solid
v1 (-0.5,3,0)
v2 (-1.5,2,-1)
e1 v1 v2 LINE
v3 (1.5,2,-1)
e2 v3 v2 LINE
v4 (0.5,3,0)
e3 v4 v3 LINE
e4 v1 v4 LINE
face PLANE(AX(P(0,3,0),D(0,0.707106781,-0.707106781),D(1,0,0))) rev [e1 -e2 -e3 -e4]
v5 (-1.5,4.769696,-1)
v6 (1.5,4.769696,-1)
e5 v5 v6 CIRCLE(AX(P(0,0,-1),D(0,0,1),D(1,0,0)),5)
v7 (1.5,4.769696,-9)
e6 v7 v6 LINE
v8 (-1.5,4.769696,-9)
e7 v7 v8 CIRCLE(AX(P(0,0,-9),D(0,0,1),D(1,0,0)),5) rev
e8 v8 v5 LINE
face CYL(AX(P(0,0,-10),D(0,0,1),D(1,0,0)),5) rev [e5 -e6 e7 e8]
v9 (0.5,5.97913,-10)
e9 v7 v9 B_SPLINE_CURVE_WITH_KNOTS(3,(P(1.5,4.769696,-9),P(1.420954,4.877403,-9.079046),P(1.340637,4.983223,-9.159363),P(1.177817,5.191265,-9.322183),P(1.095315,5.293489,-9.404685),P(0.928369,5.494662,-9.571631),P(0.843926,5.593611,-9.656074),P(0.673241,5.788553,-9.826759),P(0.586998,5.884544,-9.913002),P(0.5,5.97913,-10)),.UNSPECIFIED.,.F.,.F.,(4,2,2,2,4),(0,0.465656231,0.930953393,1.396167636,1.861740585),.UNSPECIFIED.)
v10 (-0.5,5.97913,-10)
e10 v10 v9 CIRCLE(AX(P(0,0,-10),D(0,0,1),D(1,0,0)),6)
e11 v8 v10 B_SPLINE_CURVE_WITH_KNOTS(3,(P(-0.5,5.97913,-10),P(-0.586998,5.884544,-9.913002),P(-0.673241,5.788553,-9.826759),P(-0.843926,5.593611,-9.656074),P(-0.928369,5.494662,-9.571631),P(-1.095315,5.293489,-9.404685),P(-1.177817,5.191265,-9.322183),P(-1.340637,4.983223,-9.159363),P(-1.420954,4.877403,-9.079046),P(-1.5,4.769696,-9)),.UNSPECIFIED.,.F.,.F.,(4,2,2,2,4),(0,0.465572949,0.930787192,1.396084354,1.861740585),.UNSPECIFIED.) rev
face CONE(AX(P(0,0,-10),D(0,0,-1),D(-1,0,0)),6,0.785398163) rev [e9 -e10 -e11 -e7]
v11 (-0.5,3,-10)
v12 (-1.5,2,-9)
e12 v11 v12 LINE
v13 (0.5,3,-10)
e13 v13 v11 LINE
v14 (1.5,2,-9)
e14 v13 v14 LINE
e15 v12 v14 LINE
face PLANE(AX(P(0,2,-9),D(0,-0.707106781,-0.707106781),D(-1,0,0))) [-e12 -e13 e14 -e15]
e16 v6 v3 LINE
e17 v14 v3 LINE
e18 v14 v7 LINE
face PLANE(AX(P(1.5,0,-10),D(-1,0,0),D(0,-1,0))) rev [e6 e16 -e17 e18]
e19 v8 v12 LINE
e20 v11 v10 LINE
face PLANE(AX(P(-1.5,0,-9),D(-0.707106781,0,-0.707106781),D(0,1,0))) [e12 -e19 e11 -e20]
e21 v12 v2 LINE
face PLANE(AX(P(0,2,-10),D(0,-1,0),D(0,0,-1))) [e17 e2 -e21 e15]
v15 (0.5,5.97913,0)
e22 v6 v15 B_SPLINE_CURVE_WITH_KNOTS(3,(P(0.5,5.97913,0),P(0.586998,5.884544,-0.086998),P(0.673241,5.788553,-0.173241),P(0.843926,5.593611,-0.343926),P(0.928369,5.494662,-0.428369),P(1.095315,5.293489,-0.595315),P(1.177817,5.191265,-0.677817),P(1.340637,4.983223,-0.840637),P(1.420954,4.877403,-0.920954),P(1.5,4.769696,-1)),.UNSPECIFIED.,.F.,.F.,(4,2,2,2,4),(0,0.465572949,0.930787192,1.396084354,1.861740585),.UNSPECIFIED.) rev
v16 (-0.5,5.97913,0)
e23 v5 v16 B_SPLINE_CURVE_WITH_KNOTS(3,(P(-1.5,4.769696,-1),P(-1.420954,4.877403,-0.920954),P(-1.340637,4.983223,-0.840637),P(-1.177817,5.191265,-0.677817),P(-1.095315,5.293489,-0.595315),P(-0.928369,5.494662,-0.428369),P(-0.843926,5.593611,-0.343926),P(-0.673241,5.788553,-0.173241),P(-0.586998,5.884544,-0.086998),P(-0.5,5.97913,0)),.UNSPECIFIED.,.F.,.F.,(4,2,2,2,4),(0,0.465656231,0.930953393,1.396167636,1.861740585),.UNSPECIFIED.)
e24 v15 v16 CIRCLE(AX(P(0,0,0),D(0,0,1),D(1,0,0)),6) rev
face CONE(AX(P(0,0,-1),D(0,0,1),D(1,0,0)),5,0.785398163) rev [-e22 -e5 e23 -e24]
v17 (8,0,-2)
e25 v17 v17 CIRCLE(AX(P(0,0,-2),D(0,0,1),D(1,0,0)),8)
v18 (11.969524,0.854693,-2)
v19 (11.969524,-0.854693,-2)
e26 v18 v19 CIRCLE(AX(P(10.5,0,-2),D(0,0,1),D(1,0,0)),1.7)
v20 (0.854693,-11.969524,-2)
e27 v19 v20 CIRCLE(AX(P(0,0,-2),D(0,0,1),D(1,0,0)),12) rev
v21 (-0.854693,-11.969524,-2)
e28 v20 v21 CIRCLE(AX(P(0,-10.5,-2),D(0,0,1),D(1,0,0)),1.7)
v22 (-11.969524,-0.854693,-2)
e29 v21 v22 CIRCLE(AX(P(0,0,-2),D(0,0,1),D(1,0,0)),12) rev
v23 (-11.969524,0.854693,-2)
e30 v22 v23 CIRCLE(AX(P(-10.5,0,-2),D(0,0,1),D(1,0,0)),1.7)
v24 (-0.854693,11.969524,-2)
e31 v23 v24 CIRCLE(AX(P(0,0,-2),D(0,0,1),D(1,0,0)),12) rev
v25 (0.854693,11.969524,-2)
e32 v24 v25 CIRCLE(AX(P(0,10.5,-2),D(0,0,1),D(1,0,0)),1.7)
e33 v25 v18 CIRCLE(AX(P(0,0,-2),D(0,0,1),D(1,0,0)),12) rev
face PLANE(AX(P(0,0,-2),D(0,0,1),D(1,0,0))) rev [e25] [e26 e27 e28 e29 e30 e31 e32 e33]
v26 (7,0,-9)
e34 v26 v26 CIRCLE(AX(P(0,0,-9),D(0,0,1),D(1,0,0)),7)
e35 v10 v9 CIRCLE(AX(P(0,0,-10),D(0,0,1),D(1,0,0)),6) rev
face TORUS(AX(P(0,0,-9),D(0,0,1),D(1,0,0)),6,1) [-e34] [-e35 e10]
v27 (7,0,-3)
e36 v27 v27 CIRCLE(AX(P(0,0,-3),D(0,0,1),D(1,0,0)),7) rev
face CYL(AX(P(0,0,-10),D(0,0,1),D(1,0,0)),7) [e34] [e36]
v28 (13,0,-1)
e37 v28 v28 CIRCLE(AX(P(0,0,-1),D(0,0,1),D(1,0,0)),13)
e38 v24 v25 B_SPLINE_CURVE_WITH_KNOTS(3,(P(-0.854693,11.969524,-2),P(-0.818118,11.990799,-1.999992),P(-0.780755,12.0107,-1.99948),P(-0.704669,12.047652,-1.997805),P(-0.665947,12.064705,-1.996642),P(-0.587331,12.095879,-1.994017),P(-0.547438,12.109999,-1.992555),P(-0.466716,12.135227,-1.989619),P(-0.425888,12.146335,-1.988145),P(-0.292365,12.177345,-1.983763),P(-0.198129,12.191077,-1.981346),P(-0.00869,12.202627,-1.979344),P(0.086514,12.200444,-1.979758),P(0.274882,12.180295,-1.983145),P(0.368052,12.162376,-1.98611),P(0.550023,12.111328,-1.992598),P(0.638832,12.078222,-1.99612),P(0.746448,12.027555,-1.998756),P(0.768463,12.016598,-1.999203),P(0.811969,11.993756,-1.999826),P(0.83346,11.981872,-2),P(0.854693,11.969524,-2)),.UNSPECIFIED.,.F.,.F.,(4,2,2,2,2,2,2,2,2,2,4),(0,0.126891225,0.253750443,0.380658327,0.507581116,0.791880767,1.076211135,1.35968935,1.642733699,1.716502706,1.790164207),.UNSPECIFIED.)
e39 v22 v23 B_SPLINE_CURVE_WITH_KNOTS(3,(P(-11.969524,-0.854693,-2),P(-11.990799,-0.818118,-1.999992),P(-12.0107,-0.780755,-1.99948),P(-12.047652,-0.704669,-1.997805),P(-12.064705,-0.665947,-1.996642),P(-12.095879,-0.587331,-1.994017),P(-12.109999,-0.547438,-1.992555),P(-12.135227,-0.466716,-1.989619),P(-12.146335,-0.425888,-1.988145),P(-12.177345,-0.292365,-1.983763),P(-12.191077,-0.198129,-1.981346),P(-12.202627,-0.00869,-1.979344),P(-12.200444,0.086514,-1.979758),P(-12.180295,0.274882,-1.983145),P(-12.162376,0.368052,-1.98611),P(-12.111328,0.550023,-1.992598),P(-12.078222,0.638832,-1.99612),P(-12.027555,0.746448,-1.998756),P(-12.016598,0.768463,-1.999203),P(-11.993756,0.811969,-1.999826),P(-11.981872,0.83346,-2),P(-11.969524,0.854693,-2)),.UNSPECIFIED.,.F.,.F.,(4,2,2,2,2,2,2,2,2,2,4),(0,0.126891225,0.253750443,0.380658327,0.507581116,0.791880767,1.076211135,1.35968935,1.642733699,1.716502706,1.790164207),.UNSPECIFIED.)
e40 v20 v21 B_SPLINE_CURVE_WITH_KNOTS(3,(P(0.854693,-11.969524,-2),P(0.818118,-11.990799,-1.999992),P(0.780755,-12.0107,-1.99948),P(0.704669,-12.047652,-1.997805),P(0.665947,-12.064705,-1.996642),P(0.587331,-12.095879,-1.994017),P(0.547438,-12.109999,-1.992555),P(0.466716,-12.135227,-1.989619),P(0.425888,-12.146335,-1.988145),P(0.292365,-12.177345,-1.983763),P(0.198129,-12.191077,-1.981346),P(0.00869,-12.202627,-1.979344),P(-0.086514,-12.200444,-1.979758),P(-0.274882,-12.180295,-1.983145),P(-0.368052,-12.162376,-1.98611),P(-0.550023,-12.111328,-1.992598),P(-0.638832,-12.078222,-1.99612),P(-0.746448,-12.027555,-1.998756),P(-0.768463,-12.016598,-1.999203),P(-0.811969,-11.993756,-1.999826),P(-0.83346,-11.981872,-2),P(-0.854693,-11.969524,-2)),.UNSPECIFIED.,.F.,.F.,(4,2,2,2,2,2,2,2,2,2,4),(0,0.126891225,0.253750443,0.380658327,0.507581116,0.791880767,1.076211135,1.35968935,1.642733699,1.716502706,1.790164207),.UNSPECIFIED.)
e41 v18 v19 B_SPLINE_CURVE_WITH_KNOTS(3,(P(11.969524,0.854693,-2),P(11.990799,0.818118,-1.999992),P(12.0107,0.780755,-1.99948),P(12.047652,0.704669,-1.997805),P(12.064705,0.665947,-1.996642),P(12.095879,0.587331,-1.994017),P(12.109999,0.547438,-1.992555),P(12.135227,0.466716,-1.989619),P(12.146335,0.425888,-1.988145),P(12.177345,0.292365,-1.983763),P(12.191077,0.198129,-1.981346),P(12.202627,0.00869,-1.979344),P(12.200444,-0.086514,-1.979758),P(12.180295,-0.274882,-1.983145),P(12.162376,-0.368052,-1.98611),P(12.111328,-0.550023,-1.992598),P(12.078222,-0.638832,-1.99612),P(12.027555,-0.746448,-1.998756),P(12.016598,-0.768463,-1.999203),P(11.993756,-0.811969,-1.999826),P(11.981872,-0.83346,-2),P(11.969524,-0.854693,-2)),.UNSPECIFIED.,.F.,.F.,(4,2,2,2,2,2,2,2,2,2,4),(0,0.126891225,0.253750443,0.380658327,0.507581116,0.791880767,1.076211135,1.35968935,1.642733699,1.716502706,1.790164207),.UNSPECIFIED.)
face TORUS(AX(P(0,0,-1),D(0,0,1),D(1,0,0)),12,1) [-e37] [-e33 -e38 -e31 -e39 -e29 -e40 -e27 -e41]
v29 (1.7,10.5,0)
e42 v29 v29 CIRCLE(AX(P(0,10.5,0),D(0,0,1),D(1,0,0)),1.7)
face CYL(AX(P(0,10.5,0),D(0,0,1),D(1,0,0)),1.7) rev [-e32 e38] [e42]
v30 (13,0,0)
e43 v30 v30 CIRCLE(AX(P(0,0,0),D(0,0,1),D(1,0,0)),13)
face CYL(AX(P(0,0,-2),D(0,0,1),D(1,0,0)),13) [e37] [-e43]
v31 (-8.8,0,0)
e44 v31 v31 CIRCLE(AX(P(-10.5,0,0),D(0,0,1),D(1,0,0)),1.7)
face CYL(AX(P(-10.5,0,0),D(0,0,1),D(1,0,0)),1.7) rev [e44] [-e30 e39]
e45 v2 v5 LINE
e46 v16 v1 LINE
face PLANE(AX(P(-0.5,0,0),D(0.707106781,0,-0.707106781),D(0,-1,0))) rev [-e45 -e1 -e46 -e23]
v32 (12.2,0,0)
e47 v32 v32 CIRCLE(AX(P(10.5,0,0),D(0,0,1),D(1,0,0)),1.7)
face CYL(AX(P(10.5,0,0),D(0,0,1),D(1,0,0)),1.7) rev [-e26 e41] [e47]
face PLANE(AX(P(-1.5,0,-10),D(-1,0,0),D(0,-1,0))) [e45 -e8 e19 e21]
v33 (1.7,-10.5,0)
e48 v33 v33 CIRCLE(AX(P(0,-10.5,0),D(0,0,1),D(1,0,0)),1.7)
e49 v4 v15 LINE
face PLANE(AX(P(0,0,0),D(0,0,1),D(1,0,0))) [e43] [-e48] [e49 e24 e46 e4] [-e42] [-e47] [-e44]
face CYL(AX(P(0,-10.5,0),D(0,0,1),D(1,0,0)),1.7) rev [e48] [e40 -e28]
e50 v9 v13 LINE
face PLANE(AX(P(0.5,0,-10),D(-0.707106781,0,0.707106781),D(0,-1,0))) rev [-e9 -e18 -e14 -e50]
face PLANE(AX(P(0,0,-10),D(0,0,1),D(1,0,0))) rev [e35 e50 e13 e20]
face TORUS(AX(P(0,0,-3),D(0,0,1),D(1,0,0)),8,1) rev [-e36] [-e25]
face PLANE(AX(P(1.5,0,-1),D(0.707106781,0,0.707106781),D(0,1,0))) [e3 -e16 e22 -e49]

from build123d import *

# Parameters (mm, degrees)
CROQUIS1_R                   = 7
SALIENTE_EXTRUIR1_DEPTH      = 10
CROQUIS1_3_R                 = 13
CROQUIS1_3_R_2               = 7
SALIENTE_EXTRUIR2_DEPTH      = 2
TALADRO_DE_MARGEN_PARA_M31_D = 3.4
CHAFL_N1_SIZE                = 1
REDONDEO2_R                  = 1
CHAFL_N2_SIZE                = 1


with BuildPart() as part:
    # Croquis1 → Saliente-Extruir1 (new body)
    # profile 1 of 5: a face of its own
    with BuildSketch(Plane.XY):
        Circle(CROQUIS1_R)
        with BuildLine():
            Line((-1.5, 5), (0, 5))
            Line((0, 5), (1.5, 5))
            Line((1.5, 5), (1.5, 4.769696007))
            ThreePointArc((1.5, 4.769696007), (4.031128874, 2.958039892), (5, 0))
            ThreePointArc((5, 0), (-2.958039892, -4.031128874), (-1.5, 4.769696007))
            Line((-1.5, 4.769696007), (-1.5, 5))
        make_face(mode=Mode.SUBTRACT)
    # profile 2 of 5: a face of its own
    with BuildSketch(Plane.XY):
        with BuildLine():
            Line((0, 5), (0, 2))
            Line((0, 2), (1.5, 2))
            Line((1.5, 2), (1.5, 4.769696007))
            ThreePointArc((1.5, 4.769696007), (0.758788496, 4.942088629), (0, 5))
        make_face()
    # profile 3 of 5: a face of its own
    with BuildSketch(Plane.XY):
        with BuildLine():
            Line((-1.5, 2), (0, 2))
            Line((0, 2), (0, 5))
            ThreePointArc((0, 5), (-0.758788496, 4.942088629), (-1.5, 4.769696007))
            Line((-1.5, 4.769696007), (-1.5, 2))
        make_face()
    # profile 4 of 5: a face of its own
    with BuildSketch(Plane.XY):
        with BuildLine():
            Line((1.5, 5), (0, 5))
            ThreePointArc((0, 5), (0.758788496, 4.942088629), (1.5, 4.769696007))
            Line((1.5, 4.769696007), (1.5, 5))
        make_face()
    # profile 5 of 5: a face of its own
    with BuildSketch(Plane.XY):
        with BuildLine():
            ThreePointArc((-1.5, 4.769696007), (-0.758788496, 4.942088629), (0, 5))
            Line((0, 5), (-1.5, 5))
            Line((-1.5, 5), (-1.5, 4.769696007))
        make_face()
    extrude(amount=-SALIENTE_EXTRUIR1_DEPTH)

    # Croquis1<3> → Saliente-Extruir2 (add)
    with BuildSketch(Plane.XY):
        Circle(CROQUIS1_3_R)
        Circle(CROQUIS1_3_R_2, mode=Mode.SUBTRACT)
    extrude(amount=-SALIENTE_EXTRUIR2_DEPTH)

    # Taladro de margen para M31 (through all)
    with Locations(Plane.XY):
        with Locations((0, 10.5), (10.5, 0), (0, -10.5), (-10.5, 0), (0, 0)):
            Hole(TALADRO_DE_MARGEN_PARA_M31_D / 2)

    # Chaflán1
    chafl_n1_edges = [part.edges().sort_by_distance(p)[0] for p in [
        (-1.5, 3.384848004, -10),
        (0, 2, -10),
        (1.5, 3.384848004, -10),
        (0, -5, -10),
    ]]
    chamfer(chafl_n1_edges, length=CHAFL_N1_SIZE)

    # Redondeo2
    # the kernel refuses this fillet: 1 mm, written as the material it adds along each edge
    with BuildSketch(Plane(origin=(0, 0, -2), x_dir=(1, 0, 0), z_dir=(0, -1, 0))) as redondeo2_piece_1:
        with BuildLine():
            CenterArc((7 + REDONDEO2_R, -REDONDEO2_R), REDONDEO2_R, 90, 90)
            Line((7 + REDONDEO2_R, 0), (7, 0))
            Line((7, 0), (7, -REDONDEO2_R))
        make_face()
    revolve(axis=Axis((0, 0, -2), (0, 0, 1)))
    # the kernel refuses this fillet: 1 mm, written as the material it takes off along each edge
    with BuildSketch(Plane(origin=(0, 0, -2), x_dir=(1, 0, 0), z_dir=(0, -1, 0))) as redondeo2_2_piece_1:
        with BuildLine():
            CenterArc((13 - REDONDEO2_R, REDONDEO2_R), REDONDEO2_R, 270, 90)
            Line((13, REDONDEO2_R), (13, 0))
            Line((13, 0), (13 - REDONDEO2_R, 0))
        make_face()
    revolve(axis=Axis((0, 0, -2), (0, 0, 1)), mode=Mode.SUBTRACT)
    with BuildSketch(Plane(origin=(0, 0, -10), x_dir=(1, 0, 0), z_dir=(0, -1, 0))) as redondeo2_2_piece_2:
        with BuildLine():
            CenterArc((7 - REDONDEO2_R, REDONDEO2_R), REDONDEO2_R, 270, 90)
            Line((7, REDONDEO2_R), (7, 0))
            Line((7, 0), (7 - REDONDEO2_R, 0))
        make_face()
    revolve(axis=Axis((0, 0, -10), (0, 0, 1)), mode=Mode.SUBTRACT)

    # Chaflán2
    chafl_n2_edges = [part.edges().sort_by_distance(p)[0] for p in [
        (1.5, 3.384848004, 0),
        (0, 2, 0),
        (-1.5, 3.384848004, 0),
        (0, -5, 0),
    ]]
    chamfer(chafl_n2_edges, length=CHAFL_N2_SIZE)


solid = part.part
